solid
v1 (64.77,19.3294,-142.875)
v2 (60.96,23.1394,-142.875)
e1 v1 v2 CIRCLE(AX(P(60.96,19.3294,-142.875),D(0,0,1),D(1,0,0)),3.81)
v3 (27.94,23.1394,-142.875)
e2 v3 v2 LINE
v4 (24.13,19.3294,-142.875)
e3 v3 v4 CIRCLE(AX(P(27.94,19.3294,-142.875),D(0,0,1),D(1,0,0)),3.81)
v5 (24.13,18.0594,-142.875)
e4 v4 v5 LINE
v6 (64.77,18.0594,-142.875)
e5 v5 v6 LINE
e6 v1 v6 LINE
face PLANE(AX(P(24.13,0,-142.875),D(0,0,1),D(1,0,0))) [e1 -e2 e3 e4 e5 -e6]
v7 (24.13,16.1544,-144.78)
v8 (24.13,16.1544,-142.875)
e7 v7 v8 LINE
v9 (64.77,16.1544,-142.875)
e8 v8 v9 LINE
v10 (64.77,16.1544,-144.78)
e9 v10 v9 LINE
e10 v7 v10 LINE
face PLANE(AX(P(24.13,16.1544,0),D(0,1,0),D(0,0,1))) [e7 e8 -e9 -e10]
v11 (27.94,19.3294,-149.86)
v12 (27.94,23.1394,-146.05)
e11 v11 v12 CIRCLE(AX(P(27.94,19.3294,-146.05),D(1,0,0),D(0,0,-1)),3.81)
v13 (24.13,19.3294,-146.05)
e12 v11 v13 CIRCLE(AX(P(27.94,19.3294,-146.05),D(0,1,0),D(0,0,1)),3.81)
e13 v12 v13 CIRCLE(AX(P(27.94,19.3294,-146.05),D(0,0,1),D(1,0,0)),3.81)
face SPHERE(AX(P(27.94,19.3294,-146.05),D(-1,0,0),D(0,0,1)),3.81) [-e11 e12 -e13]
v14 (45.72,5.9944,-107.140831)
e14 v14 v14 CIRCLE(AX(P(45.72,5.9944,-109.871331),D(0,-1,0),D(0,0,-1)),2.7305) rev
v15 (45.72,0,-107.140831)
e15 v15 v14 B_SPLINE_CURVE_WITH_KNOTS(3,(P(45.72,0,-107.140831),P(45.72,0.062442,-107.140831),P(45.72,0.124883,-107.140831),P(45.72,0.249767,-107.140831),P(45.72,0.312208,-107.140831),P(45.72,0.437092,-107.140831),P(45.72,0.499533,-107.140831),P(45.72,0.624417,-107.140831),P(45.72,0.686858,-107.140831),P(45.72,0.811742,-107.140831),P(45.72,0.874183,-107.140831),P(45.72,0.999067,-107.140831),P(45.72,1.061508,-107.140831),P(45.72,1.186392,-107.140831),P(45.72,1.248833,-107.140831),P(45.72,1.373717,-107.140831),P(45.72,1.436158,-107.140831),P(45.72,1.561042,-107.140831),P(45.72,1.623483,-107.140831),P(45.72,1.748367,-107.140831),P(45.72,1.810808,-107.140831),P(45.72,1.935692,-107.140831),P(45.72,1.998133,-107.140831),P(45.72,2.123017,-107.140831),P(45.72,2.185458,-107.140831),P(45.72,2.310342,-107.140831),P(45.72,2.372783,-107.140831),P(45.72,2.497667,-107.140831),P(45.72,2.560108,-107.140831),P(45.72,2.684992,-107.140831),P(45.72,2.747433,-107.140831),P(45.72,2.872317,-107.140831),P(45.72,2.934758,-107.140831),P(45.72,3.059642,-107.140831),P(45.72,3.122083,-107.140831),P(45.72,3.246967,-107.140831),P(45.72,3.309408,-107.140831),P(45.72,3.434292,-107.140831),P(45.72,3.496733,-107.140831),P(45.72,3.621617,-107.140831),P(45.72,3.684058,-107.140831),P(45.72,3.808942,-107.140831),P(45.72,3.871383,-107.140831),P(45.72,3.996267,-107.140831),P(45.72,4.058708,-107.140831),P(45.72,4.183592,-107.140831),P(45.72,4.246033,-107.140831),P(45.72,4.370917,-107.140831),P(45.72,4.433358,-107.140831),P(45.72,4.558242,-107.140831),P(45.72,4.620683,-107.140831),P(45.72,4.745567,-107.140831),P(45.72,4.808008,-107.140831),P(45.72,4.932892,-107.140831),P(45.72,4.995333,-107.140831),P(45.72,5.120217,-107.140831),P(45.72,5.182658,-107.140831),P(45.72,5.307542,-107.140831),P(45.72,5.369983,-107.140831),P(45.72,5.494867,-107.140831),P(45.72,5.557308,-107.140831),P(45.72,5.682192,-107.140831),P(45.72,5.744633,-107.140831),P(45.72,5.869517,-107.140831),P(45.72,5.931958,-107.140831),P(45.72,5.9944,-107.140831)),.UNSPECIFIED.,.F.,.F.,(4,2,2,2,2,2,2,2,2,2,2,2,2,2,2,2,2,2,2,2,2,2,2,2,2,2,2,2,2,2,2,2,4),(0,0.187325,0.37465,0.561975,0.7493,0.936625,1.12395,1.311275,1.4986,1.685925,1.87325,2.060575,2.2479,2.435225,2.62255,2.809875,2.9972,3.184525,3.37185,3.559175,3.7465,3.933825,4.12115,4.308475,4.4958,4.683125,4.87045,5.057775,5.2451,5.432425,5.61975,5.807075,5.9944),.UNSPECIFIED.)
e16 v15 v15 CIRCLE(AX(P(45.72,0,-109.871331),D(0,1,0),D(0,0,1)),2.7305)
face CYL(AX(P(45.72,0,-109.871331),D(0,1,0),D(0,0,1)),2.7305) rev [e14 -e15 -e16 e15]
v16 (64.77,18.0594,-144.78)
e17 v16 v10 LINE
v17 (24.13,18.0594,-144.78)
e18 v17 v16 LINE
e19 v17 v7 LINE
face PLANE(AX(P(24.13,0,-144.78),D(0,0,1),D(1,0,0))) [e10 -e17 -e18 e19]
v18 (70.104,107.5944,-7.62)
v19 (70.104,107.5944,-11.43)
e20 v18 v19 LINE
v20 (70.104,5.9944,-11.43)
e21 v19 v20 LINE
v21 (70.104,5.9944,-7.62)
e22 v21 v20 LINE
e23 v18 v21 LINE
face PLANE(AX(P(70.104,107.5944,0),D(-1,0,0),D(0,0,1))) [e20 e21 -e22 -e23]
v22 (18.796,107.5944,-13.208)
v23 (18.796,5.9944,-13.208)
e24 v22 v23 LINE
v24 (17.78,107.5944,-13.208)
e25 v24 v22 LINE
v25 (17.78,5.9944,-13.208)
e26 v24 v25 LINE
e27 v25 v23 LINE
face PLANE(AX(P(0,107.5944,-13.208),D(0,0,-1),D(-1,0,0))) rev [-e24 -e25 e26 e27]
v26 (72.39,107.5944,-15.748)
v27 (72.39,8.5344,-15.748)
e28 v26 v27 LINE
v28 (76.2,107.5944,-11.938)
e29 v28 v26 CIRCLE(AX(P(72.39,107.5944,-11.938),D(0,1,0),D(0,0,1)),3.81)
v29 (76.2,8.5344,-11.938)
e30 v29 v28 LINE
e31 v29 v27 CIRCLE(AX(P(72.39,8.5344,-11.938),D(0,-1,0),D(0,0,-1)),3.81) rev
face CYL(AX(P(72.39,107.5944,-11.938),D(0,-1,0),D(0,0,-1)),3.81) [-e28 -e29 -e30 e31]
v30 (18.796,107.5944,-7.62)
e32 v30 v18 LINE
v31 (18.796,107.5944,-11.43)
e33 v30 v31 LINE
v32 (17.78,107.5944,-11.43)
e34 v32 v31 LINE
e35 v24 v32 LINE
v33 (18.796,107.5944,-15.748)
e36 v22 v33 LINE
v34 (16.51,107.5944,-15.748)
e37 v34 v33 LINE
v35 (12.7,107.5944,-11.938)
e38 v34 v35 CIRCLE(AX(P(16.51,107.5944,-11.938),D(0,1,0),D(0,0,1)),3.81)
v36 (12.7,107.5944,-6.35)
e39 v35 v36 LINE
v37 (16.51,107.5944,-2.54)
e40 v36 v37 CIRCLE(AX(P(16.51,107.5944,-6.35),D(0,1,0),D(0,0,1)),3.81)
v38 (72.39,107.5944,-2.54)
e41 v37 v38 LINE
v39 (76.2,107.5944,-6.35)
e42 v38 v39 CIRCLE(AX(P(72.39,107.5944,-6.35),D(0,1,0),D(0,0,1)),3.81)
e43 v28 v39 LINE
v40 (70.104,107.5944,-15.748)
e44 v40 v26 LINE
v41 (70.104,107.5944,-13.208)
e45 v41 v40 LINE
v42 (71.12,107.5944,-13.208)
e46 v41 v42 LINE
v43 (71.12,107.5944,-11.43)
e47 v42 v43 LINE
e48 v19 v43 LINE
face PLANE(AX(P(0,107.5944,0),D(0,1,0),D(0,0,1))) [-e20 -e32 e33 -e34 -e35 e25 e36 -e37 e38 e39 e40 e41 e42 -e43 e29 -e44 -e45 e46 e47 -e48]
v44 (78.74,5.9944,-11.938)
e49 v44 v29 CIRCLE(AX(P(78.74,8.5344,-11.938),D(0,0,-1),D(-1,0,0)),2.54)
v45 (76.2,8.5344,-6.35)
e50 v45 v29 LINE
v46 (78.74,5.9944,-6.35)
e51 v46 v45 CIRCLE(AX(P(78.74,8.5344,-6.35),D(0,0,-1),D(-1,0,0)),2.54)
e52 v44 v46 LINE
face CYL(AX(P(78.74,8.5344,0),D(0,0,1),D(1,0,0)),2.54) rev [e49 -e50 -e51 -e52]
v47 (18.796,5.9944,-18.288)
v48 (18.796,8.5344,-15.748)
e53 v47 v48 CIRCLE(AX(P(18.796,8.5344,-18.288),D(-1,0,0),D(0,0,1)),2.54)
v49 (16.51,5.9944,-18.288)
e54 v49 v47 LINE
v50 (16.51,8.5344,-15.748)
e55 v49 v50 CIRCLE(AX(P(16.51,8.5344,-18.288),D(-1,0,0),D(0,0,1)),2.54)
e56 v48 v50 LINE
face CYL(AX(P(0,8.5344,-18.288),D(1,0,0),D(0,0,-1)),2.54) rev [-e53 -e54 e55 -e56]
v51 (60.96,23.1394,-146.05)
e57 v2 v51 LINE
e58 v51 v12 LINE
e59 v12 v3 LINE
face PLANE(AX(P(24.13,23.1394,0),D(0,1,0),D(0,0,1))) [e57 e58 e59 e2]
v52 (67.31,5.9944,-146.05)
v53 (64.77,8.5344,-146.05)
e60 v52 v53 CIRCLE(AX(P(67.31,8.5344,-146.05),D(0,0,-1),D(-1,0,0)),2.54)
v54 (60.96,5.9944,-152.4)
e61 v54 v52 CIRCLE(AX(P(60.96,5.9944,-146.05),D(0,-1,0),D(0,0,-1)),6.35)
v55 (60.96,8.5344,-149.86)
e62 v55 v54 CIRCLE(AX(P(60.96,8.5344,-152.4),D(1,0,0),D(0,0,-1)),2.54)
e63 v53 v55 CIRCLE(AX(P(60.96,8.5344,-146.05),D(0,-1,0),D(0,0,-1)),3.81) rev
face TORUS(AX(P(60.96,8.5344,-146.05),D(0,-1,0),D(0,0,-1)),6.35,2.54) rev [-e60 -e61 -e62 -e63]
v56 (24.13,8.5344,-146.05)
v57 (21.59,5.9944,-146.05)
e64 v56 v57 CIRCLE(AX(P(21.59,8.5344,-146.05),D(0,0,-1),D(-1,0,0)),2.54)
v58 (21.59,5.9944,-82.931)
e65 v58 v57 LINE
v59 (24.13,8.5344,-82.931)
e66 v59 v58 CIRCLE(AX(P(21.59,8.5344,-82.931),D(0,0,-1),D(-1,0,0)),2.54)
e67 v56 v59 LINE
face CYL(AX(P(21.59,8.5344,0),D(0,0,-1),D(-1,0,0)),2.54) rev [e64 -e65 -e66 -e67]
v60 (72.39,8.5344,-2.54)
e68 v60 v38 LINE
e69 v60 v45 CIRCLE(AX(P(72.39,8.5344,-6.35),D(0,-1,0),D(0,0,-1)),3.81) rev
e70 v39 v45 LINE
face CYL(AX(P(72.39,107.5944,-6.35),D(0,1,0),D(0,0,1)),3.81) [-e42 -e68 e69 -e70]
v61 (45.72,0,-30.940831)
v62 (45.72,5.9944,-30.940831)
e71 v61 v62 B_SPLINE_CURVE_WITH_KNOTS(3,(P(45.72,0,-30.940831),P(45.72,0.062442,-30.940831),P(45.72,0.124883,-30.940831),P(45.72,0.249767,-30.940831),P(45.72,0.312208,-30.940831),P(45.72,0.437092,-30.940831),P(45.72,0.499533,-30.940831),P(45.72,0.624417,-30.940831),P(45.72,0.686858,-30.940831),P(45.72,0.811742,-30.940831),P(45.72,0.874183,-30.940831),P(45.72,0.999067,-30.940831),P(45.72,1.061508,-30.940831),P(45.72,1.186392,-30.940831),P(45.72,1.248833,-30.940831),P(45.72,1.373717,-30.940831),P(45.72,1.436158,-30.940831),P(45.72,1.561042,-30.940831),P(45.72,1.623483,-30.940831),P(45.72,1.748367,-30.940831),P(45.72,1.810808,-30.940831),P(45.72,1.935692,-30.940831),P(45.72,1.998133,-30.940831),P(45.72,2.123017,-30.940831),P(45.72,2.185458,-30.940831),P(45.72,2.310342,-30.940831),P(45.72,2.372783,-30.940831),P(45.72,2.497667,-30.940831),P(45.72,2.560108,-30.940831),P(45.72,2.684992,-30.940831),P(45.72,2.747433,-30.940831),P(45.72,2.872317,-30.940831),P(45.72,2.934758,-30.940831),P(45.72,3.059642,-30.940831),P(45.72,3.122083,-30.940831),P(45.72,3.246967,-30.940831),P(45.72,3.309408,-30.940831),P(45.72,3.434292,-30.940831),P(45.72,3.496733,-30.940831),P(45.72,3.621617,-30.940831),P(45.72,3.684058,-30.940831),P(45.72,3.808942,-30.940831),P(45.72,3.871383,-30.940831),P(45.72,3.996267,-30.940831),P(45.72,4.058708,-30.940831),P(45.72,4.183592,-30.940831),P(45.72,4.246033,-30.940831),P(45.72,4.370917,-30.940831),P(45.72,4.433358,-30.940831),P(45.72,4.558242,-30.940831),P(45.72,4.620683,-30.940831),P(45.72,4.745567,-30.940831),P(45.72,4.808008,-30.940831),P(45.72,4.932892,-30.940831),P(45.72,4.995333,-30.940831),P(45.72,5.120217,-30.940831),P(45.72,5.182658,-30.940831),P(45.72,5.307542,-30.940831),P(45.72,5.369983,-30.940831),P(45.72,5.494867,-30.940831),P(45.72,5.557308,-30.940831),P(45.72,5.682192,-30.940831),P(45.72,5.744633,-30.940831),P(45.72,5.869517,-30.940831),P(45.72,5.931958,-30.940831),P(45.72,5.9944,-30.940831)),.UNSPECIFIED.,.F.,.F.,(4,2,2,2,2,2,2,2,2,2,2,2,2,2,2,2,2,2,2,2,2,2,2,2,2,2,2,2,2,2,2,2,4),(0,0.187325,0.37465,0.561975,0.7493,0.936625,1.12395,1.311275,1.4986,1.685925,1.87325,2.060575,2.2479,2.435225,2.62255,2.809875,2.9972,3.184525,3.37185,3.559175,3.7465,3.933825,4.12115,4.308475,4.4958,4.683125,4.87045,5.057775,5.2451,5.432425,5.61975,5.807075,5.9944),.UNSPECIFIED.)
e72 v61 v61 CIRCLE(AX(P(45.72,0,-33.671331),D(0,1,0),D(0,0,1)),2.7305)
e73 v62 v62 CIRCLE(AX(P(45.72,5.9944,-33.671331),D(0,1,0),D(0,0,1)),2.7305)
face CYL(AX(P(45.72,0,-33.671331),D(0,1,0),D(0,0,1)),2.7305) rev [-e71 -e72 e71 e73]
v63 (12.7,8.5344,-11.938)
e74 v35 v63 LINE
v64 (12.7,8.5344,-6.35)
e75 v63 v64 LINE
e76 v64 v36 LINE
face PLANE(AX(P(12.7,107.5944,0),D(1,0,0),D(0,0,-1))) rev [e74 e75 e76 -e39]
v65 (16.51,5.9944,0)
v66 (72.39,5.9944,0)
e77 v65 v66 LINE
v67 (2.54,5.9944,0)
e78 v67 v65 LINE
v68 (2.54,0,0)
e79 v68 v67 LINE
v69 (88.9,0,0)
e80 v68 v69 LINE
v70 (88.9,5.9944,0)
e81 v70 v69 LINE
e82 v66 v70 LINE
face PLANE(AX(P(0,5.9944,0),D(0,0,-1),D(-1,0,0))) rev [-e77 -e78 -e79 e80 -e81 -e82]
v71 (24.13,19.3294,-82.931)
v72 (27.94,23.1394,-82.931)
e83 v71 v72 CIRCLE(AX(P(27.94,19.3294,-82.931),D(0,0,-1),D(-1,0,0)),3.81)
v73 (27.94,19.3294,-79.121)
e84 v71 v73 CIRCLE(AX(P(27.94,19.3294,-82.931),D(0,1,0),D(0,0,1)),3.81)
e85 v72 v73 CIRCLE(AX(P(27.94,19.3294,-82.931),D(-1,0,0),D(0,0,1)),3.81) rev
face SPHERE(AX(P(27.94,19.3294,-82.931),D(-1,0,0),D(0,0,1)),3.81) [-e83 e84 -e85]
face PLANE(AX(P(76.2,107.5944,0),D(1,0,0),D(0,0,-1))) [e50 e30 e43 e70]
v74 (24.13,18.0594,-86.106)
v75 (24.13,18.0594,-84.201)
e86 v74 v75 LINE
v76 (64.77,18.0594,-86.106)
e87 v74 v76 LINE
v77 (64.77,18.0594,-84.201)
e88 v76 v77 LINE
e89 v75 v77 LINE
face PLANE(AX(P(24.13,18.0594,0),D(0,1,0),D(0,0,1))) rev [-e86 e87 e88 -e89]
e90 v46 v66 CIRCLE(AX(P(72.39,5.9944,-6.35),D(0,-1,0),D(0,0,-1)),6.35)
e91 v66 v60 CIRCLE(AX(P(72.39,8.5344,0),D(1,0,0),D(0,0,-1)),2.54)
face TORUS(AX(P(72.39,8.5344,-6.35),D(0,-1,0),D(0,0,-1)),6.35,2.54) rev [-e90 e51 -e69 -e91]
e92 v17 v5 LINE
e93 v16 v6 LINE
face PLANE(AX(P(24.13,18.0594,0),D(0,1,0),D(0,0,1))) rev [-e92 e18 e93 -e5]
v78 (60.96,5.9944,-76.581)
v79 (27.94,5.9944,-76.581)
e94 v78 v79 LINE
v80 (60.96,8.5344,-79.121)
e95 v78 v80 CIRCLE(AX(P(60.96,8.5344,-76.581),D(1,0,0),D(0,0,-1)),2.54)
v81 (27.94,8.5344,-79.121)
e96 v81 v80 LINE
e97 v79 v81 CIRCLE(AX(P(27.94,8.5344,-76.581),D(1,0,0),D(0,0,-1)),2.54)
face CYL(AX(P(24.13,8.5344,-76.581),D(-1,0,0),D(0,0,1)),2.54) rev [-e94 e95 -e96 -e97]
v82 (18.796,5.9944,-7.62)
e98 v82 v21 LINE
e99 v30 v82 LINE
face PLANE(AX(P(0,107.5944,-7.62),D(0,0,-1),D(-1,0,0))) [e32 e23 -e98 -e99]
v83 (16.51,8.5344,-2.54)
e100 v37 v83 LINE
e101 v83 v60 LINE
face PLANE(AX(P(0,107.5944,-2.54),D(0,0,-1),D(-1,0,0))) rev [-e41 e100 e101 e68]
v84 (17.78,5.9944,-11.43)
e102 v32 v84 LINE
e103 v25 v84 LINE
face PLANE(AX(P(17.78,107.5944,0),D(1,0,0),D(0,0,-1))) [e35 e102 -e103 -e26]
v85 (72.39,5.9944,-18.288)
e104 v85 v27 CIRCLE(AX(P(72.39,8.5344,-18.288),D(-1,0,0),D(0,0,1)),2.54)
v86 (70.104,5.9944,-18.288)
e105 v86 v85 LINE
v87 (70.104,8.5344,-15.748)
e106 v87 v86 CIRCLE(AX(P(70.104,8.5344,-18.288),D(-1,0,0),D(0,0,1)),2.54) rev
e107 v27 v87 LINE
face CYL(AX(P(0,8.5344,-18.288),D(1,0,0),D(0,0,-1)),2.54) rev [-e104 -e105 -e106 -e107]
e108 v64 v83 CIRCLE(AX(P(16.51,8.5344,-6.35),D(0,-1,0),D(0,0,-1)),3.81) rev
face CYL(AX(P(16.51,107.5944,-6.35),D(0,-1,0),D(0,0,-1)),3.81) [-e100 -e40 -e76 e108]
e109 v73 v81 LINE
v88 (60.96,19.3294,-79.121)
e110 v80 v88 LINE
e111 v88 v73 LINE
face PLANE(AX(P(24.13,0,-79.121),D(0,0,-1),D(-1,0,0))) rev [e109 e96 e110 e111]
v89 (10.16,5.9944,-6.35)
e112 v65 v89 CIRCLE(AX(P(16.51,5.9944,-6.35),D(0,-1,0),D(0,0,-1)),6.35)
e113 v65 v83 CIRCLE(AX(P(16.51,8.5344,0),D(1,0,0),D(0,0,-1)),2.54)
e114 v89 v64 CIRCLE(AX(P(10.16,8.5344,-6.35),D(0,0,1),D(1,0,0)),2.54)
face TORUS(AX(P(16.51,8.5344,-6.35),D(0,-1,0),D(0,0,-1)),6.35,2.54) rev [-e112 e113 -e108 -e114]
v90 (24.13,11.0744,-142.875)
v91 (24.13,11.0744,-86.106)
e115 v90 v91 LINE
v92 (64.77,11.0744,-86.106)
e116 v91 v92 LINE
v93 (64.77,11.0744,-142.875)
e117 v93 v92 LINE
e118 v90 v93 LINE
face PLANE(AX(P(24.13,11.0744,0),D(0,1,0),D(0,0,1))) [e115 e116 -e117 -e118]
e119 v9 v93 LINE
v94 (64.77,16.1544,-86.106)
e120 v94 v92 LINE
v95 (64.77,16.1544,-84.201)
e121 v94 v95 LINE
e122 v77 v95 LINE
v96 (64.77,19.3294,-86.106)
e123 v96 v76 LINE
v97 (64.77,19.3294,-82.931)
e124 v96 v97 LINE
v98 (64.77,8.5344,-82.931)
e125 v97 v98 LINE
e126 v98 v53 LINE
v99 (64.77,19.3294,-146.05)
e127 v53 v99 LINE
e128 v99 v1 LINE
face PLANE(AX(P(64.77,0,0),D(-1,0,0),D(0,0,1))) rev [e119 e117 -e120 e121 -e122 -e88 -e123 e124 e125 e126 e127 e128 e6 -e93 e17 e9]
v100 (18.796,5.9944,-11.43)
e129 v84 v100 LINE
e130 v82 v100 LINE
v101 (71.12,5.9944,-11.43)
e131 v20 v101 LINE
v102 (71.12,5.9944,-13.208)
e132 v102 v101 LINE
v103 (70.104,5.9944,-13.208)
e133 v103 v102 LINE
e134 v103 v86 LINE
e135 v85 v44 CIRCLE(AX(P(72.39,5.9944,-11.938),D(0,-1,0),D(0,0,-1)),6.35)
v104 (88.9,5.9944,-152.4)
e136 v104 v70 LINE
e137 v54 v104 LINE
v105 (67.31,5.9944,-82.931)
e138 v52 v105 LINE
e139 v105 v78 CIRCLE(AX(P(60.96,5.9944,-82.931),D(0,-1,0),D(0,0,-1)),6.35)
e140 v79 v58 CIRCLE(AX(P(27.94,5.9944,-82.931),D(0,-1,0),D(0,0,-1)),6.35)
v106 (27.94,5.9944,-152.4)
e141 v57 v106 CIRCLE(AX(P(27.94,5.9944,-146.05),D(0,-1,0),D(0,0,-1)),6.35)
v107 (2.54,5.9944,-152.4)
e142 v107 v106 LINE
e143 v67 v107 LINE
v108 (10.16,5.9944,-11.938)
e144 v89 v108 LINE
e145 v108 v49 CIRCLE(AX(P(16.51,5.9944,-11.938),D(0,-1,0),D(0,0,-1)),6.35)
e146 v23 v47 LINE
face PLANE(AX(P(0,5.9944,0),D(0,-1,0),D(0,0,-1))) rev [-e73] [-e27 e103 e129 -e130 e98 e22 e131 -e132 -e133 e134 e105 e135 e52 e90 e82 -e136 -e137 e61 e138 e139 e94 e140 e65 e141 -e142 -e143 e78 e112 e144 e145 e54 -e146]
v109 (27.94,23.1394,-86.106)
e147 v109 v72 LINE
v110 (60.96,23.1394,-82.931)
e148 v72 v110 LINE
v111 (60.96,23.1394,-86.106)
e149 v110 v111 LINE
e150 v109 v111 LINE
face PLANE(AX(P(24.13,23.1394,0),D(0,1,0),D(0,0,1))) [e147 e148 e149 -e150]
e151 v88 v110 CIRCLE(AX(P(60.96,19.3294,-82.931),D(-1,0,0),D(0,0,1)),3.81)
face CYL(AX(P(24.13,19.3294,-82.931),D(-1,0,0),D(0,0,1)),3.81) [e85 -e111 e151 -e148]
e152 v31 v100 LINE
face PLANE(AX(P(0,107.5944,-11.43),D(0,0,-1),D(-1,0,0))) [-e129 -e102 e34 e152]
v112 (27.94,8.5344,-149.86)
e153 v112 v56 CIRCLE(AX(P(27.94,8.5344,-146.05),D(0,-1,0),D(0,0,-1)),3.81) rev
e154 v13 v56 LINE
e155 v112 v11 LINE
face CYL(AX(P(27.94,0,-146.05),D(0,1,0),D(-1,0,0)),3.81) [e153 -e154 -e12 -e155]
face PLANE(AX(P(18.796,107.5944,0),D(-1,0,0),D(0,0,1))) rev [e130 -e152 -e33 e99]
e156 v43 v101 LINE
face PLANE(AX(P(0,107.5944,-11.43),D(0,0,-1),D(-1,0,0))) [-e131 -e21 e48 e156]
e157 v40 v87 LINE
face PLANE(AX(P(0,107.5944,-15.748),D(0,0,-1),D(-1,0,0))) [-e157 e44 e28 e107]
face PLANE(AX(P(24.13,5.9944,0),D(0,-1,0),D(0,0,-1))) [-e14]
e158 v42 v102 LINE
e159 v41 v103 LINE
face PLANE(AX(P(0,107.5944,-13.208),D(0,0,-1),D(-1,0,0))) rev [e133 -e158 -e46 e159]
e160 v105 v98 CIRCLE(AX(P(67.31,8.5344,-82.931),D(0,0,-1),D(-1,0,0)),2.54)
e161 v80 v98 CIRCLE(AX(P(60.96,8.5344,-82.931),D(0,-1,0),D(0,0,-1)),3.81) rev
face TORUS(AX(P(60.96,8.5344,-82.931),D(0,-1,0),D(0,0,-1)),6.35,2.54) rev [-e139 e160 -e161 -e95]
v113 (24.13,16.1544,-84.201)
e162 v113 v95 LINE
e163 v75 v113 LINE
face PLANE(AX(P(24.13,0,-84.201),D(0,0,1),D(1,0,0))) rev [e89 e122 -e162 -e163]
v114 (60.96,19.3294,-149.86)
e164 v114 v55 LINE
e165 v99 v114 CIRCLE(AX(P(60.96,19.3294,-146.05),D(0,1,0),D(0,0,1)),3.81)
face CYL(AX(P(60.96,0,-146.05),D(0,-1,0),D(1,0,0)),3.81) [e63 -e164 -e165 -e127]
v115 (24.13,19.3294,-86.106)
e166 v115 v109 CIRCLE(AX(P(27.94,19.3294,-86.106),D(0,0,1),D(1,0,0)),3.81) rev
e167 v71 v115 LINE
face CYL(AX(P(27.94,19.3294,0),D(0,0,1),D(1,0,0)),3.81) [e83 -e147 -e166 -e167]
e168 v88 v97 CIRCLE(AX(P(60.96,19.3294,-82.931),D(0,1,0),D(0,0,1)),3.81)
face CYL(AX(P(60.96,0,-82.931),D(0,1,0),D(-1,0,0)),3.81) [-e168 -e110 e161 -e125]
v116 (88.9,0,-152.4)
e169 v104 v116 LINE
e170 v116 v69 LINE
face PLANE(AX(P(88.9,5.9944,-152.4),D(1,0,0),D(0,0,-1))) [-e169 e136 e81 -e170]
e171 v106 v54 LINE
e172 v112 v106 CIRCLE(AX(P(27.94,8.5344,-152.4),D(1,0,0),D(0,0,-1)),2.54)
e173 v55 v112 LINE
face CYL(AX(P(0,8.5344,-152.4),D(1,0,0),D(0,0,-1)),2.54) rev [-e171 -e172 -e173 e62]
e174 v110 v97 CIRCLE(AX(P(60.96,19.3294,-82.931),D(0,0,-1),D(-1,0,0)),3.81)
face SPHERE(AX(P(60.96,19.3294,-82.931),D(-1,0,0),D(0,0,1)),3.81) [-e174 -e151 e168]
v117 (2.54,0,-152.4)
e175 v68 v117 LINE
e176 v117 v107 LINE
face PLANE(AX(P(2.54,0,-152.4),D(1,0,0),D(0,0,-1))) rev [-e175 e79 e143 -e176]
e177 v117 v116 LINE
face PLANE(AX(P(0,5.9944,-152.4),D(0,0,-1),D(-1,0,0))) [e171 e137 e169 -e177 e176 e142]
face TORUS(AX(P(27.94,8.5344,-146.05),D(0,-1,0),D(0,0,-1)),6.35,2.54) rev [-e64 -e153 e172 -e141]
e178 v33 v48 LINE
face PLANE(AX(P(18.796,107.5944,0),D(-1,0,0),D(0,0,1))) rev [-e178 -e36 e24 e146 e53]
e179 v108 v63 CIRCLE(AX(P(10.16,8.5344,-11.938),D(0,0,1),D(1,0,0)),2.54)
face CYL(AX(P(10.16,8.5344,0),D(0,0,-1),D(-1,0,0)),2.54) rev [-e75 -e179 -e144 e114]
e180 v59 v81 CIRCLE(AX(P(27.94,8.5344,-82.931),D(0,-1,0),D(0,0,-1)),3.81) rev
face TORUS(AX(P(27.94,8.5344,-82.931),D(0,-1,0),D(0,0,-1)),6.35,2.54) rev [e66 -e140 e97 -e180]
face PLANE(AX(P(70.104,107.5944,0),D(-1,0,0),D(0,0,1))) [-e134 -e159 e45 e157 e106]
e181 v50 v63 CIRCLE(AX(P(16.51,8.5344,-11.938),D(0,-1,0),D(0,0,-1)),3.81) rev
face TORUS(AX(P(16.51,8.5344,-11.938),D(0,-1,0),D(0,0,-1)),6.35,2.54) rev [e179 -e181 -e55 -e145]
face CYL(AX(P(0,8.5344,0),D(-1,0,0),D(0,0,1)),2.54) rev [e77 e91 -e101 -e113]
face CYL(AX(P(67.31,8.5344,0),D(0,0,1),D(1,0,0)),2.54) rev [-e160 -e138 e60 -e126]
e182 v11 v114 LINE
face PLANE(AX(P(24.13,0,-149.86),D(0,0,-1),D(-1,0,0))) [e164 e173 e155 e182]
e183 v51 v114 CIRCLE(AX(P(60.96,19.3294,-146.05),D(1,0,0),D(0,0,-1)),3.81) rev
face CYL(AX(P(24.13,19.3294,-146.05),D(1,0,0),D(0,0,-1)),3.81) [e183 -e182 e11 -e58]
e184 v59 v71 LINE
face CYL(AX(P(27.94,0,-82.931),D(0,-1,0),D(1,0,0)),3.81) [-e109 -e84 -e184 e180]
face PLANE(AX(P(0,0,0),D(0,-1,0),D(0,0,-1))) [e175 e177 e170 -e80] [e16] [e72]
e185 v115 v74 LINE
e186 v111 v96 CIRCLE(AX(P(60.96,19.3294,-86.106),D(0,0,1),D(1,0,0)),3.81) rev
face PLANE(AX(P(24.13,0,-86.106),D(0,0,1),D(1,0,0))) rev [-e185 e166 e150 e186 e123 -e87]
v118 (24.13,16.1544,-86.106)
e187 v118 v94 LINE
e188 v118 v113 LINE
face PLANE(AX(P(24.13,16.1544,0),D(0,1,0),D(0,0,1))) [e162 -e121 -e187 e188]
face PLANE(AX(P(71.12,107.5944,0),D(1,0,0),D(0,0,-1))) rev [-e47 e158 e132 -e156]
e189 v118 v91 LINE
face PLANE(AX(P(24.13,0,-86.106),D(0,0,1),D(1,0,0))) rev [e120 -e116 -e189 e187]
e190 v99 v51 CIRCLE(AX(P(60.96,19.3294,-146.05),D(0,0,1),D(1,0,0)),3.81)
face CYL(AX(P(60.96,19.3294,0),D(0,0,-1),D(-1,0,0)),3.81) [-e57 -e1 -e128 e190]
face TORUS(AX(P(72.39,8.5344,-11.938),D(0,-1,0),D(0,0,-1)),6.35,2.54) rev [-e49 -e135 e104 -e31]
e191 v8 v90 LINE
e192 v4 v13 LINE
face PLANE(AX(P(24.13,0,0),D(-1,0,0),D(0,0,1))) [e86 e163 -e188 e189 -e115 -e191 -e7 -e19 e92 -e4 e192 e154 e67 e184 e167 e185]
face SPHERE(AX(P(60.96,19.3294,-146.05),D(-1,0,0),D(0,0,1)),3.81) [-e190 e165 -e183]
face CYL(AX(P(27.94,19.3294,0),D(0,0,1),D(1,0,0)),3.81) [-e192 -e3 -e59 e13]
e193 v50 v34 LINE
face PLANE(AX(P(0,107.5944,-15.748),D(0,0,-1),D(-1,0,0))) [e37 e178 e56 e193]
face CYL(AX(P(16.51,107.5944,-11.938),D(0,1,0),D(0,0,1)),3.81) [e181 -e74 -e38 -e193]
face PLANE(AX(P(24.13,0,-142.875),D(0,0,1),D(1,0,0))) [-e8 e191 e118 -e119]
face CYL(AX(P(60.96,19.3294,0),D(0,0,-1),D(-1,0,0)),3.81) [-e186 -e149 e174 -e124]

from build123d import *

# Parameters (mm, degrees)
SKETCH2_W               = 88.9
SKETCH2_H               = 152.4
BOSS_EXTRUDE1_DEPTH     = 5.9944
CUT_EXTRUDE2_DEPTH      = 177.535840076
CUT_EXTRUDE2_DEPTH_BACK = 177.535840076
SKETCH4_R               = 2.7305
BOSS_EXTRUDE2_DEPTH     = 101.6
FILLET1_R               = 3.81
FILLET2_R               = 2.54
BOSS_EXTRUDE3_DEPTH     = 20.32
FILLET3_R               = 3.81
FILLET6_R               = 3.81
FILLET7_R               = 2.54
CUT_EXTRUDE3_DEPTH      = 204.596488182
CUT_EXTRUDE3_DEPTH_BACK = 204.596488182
SKETCH7_W               = 2.54
SKETCH7_H               = 152.4


with BuildPart() as part:
    # Sketch2 → Boss-Extrude1 (new body)
    with BuildSketch(Plane(origin=(0, 0, 0), x_dir=(1, 0, 0), z_dir=(0, 1, 0))):
        with Locations((44.45, 76.2)):
            Rectangle(SKETCH2_W, SKETCH2_H)
    extrude(amount=BOSS_EXTRUDE1_DEPTH)

    # Sketch4 → Cut-Extrude2 (cut, two sides: drawn at the far end of the back side and taken through both)
    with BuildSketch(Plane(origin=(0, 5.9944, 0), x_dir=(1, 0, 0), z_dir=(0, 1, 0)).offset(-CUT_EXTRUDE2_DEPTH_BACK)):
        with Locations(Location((45.72, 109.871331367, 0), (0, 0, 270))):
            Circle(SKETCH4_R)
        with Locations(Location((45.72, 33.671331367, 0), (0, 0, 270))):
            Circle(SKETCH4_R)
    extrude(amount=CUT_EXTRUDE2_DEPTH + CUT_EXTRUDE2_DEPTH_BACK, mode=Mode.SUBTRACT)

    # Sketch5 → Boss-Extrude2 (add)
    with BuildSketch(Plane(origin=(0, 5.9944, 0), x_dir=(1, 0, 0), z_dir=(0, 1, 0))):
        Polygon((18.796, 15.748), (12.7, 15.748), (12.7, 2.54), (76.2, 2.54), (76.2, 15.748), (70.104, 15.748), (70.104, 13.208), (71.12, 13.208), (71.12, 11.43), (70.104, 11.43), (70.104, 7.62), (18.796, 7.62), (18.796, 11.43), (17.78, 11.43), (17.78, 13.208), (18.796, 13.208), align=None)
    extrude(amount=BOSS_EXTRUDE2_DEPTH)

    # Fillet1
    fillet1_edges = [part.edges().sort_by_distance(p)[0] for p in [
        (12.7, 56.7944, -15.748),
        (12.7, 56.7944, -2.54),
        (76.2, 56.7944, -2.54),
        (76.2, 56.7944, -15.748),
    ]]
    fillet(fillet1_edges, radius=FILLET1_R)

    # Fillet2
    fillet2_edges = [part.edges().sort_by_distance(p)[0] for p in [
        (71.247, 5.9944, -15.748),
        (44.45, 5.9944, -2.54),
        (12.7, 5.9944, -9.144),
        (17.653, 5.9944, -15.748),
        (76.2, 5.9944, -9.144),
        (13.815923164, 5.9944, -3.655923164),
        (13.815923164, 5.9944, -14.632076836),
        (75.084076836, 5.9944, -3.655923164),
        (75.084076836, 5.9944, -14.632076836),
    ]]
    fillet(fillet2_edges, radius=FILLET2_R - 0.0001)  # a hair under: the kernel refuses the full size

    # Sketch6 → Boss-Extrude3 (add, symmetric)
    with BuildSketch(Plane.ZY.offset(-44.45)):
        Polygon((-149.86, 5.9944), (-79.121, 5.9944), (-79.121, 23.1394), (-86.106, 23.1394), (-86.106, 18.0594), (-84.201, 18.0594), (-84.201, 16.1544), (-86.106, 16.1544), (-86.106, 11.0744), (-142.875, 11.0744), (-142.875, 16.1544), (-144.78, 16.1544), (-144.78, 18.0594), (-142.875, 18.0594), (-142.875, 23.1394), (-149.86, 23.1394), align=None)
    extrude(amount=BOSS_EXTRUDE3_DEPTH, both=True)

    # Fillet3
    fillet3_edges = [part.edges().sort_by_distance(p)[0] for p in [
        (44.45, 23.1394, -149.86),
        (44.45, 23.1394, -79.121),
    ]]
    fillet(fillet3_edges, radius=FILLET3_R)

    # Fillet6
    fillet6_edges = [part.edges().sort_by_distance(p)[0] for p in [
        (24.13, 12.6619, -149.86),
        (64.77, 12.6619, -79.121),
        (24.13, 23.1394, -84.5185),
        (24.13, 12.6619, -79.121),
        (64.77, 23.1394, -84.5185),
        (64.77, 12.6619, -149.86),
        (64.77, 23.1394, -144.4625),
        (64.77, 22.023476836, -148.744076836),
        (64.77, 22.023476836, -80.236923164),
        (24.13, 23.1394, -144.4625),
        (24.13, 22.023476836, -148.744076836),
        (24.13, 22.023476836, -80.236923164),
    ]]
    fillet(fillet6_edges, radius=FILLET6_R)

    # Fillet7
    fillet7_edges = [part.edges().sort_by_distance(p)[0] for p in [
        (24.13, 5.9944, -114.4905),
        (64.77, 5.9944, -114.4905),
        (44.45, 5.9944, -79.121),
        (44.45, 5.9944, -149.86),
        (25.245923164, 5.9944, -80.236923164),
        (63.654076836, 5.9944, -80.236923164),
        (63.654076836, 5.9944, -148.744076836),
        (25.245923164, 5.9944, -148.744076836),
    ]]
    fillet(fillet7_edges, radius=FILLET7_R - 0.0001)  # a hair under: the kernel refuses the full size

    # Sketch7 → Cut-Extrude3 (cut, two sides: drawn at the far end of the back side and taken through both)
    with BuildSketch(Plane(origin=(0, 5.9944, 0), x_dir=(1, 0, 0), z_dir=(0, 1, 0)).offset(-CUT_EXTRUDE3_DEPTH_BACK)):
        with Locations((1.27, 76.2)):
            Rectangle(SKETCH7_W, SKETCH7_H)
    extrude(amount=CUT_EXTRUDE3_DEPTH + CUT_EXTRUDE3_DEPTH_BACK, mode=Mode.SUBTRACT)


solid = part.part
